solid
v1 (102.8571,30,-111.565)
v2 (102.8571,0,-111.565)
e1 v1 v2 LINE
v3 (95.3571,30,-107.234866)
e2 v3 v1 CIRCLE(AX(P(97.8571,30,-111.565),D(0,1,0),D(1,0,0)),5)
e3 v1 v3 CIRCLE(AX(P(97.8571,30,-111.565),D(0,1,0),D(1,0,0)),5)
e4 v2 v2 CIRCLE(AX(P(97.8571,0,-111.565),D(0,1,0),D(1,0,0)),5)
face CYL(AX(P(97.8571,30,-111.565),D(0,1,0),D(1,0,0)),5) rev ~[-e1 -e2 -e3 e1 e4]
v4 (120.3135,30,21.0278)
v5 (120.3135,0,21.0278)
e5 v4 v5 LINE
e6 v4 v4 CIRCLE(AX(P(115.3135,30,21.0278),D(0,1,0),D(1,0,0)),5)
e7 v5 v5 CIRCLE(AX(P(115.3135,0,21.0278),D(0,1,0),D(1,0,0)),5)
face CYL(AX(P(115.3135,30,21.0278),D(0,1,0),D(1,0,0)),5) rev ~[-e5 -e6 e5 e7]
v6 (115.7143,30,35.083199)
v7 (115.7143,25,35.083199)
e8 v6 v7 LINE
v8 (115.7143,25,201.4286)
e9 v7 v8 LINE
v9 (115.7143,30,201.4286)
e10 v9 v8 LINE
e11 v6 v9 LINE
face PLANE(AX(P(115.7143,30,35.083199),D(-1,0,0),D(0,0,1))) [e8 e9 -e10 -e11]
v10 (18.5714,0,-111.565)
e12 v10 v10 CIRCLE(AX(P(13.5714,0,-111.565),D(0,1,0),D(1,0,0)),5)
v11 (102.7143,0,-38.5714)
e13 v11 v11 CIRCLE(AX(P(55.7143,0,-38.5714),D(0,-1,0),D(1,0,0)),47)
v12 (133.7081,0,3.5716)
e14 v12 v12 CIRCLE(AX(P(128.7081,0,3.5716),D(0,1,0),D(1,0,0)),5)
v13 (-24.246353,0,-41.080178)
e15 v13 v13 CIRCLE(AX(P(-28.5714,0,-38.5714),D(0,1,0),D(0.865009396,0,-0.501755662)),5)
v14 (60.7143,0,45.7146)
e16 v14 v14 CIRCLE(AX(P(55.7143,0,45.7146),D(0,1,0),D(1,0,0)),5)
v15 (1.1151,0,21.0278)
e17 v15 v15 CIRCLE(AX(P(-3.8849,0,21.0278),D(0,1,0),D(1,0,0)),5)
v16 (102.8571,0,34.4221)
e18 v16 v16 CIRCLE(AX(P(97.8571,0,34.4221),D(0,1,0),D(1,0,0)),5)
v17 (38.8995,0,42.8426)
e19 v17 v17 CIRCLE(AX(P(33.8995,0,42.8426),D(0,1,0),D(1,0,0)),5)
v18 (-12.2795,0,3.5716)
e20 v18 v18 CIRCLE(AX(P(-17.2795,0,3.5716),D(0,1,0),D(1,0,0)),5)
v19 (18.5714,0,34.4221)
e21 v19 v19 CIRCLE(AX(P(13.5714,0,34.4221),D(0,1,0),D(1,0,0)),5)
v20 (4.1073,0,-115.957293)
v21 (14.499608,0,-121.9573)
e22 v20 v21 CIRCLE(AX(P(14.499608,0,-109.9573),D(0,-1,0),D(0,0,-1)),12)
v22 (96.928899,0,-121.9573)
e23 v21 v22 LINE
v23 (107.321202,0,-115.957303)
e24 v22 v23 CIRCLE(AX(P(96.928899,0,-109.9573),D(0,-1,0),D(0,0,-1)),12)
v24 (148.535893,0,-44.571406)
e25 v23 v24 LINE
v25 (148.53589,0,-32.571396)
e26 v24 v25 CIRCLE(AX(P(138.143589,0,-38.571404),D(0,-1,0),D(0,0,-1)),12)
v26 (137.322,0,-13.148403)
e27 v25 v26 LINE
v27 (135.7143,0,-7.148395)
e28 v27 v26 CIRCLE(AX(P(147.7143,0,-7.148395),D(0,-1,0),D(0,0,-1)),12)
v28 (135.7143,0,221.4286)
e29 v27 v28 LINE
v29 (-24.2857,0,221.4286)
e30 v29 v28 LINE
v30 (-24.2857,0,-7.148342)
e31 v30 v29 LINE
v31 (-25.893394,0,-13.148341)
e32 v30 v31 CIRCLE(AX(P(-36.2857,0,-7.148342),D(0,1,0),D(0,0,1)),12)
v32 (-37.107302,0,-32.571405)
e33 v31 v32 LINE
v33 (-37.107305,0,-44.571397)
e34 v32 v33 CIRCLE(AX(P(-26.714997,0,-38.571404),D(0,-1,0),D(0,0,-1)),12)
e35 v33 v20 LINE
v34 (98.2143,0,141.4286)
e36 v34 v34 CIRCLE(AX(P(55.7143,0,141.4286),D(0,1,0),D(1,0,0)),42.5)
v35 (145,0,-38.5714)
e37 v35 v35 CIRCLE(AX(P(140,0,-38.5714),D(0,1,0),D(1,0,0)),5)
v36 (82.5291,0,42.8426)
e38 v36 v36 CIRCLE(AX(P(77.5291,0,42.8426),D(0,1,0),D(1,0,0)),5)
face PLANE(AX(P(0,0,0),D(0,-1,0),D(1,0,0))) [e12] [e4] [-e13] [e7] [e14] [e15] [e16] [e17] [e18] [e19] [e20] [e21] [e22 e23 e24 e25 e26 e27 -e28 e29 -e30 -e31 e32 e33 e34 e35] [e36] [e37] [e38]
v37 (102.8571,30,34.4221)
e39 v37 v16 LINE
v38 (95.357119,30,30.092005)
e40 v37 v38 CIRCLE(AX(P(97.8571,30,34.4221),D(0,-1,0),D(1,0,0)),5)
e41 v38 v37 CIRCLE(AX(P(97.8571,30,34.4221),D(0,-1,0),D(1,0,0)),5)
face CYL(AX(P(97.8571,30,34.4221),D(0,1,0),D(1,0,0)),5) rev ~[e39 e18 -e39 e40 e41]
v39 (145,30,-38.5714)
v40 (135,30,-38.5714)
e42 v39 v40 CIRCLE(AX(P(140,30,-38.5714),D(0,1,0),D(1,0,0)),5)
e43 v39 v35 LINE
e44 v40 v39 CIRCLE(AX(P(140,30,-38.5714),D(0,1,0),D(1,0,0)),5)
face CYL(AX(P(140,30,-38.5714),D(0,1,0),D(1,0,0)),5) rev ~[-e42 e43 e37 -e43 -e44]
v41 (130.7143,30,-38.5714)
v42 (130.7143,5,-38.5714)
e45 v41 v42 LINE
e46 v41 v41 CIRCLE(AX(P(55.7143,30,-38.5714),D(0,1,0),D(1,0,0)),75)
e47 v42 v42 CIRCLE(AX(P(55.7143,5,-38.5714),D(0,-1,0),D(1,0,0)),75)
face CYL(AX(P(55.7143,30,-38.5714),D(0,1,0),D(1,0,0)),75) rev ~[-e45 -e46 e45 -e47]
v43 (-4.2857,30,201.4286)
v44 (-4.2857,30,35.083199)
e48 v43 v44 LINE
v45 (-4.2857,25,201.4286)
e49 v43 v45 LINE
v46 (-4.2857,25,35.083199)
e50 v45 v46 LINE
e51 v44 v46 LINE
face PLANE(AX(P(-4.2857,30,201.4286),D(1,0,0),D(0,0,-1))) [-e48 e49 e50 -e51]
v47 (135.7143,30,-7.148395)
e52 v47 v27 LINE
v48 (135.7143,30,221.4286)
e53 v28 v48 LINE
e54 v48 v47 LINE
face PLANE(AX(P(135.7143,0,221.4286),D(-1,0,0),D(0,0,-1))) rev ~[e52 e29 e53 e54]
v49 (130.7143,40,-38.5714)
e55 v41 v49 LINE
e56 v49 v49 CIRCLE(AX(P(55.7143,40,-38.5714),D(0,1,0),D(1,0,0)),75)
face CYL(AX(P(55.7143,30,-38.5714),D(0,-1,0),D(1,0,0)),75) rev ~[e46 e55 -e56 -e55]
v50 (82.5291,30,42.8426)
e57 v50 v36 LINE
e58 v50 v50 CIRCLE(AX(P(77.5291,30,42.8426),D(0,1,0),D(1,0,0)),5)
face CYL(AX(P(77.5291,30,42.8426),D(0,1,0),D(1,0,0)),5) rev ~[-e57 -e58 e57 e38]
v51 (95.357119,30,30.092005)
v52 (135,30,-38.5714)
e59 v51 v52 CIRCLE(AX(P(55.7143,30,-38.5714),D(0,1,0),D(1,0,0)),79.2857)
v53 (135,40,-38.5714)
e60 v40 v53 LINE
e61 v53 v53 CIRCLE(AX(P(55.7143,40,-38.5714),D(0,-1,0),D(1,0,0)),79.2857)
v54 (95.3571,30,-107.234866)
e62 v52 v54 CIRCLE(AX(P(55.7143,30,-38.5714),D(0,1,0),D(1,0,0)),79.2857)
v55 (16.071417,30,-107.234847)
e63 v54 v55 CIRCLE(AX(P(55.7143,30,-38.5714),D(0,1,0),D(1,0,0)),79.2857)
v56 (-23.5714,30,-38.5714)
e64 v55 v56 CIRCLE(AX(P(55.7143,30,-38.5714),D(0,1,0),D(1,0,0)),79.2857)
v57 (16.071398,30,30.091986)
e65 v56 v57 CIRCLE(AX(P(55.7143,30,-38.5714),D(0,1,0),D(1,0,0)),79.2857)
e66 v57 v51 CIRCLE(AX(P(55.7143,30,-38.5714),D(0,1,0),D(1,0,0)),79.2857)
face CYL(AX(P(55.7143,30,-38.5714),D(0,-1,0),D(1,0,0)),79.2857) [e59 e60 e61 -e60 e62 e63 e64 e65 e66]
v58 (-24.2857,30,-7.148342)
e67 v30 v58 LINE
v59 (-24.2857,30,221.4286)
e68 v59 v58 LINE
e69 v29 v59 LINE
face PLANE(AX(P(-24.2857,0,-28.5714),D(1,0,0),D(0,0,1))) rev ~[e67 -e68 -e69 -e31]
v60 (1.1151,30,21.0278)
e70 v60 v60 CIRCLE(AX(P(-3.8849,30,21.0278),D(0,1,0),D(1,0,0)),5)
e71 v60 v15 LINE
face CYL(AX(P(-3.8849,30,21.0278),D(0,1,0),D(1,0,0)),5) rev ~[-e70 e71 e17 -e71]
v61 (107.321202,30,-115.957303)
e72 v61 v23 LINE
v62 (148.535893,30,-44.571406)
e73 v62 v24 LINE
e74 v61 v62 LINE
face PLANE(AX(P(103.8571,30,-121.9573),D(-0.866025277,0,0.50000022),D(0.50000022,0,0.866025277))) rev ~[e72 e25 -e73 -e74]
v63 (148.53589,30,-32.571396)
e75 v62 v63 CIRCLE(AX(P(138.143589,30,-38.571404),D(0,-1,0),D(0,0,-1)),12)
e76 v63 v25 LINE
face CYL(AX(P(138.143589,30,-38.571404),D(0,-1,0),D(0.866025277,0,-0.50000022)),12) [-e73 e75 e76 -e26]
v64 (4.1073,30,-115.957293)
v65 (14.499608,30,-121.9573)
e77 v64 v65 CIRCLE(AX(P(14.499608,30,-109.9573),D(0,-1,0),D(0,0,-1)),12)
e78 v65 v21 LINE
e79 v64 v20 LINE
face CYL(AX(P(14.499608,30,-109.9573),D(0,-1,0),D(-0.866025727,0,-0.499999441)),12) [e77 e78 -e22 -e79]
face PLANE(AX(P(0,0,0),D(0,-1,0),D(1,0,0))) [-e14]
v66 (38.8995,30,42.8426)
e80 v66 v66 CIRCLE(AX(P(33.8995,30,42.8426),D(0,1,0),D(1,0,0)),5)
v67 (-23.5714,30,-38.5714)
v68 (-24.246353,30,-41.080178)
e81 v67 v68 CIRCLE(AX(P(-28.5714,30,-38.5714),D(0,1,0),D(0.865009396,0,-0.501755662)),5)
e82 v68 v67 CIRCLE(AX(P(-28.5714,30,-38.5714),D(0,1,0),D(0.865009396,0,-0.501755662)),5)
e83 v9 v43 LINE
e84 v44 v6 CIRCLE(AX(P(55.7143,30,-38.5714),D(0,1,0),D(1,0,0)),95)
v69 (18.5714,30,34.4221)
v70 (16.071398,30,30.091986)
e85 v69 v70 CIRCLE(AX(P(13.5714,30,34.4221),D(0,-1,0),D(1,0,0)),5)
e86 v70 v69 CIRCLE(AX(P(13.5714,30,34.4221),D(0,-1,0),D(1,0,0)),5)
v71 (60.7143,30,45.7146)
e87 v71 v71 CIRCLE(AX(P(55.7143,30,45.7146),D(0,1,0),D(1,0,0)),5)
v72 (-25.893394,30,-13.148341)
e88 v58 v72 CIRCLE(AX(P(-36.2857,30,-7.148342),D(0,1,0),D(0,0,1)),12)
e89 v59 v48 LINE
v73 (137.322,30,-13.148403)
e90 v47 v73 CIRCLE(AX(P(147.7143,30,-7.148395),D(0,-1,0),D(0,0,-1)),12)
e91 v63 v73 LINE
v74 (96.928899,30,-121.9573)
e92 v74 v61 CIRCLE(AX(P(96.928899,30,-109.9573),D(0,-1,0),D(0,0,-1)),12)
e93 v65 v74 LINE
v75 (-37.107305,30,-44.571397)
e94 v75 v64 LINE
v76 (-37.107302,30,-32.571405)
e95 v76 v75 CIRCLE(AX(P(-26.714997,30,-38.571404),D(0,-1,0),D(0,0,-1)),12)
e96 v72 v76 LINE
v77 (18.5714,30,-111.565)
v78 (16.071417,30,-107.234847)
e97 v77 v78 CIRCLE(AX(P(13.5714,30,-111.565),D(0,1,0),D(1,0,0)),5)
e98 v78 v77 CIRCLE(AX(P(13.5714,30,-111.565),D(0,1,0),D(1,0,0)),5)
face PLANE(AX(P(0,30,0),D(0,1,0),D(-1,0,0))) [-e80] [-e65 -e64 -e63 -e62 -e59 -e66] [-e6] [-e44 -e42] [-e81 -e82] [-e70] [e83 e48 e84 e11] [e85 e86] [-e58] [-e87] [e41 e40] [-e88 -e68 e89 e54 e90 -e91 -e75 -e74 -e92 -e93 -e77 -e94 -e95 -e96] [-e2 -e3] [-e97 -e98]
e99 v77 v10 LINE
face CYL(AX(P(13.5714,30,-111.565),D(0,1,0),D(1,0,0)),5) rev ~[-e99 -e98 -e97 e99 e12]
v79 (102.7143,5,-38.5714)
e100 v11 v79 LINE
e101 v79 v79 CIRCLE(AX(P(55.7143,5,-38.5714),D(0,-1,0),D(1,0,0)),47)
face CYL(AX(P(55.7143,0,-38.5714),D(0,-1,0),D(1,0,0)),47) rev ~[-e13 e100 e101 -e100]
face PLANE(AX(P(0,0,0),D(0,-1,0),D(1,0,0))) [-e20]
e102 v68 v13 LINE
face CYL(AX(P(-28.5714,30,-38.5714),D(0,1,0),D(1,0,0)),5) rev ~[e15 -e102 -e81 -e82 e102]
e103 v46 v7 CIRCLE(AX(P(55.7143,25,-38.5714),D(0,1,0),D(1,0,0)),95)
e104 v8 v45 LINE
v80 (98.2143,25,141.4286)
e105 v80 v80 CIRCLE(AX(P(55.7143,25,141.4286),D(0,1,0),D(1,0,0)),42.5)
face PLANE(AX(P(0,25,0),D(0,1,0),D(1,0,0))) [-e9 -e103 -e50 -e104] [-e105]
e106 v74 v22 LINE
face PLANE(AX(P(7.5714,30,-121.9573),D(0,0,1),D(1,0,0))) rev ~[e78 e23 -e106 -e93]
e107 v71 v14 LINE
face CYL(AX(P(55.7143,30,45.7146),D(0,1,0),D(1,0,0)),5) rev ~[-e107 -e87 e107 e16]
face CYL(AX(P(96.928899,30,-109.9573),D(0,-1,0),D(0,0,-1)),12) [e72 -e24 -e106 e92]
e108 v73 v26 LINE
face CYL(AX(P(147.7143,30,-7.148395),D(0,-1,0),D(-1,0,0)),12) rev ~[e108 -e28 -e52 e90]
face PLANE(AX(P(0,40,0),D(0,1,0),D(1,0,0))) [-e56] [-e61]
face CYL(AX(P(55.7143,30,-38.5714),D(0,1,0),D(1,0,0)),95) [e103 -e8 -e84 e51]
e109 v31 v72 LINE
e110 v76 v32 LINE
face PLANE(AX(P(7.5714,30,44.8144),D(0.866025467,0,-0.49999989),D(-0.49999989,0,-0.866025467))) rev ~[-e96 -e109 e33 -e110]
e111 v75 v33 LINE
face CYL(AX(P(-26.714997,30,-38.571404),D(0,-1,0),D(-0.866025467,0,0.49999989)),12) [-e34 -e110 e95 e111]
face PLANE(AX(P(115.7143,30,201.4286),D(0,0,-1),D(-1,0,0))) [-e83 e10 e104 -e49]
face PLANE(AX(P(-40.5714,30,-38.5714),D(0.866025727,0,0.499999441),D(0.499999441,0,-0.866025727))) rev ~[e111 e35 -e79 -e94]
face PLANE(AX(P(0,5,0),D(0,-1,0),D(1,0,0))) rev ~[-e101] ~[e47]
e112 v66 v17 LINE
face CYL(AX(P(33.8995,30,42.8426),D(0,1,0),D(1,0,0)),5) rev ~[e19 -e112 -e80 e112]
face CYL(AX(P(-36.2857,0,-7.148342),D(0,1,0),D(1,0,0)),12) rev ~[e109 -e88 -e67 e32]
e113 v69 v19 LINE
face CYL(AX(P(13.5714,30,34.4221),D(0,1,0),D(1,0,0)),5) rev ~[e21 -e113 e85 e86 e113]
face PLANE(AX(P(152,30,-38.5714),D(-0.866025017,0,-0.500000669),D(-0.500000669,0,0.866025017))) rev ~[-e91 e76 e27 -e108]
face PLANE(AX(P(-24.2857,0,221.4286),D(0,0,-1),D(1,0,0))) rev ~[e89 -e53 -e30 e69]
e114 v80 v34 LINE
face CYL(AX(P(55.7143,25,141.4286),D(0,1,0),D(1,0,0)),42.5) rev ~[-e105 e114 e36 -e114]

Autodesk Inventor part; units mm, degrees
ref_plane "YZ Plane" through (0, 0, 0) normal (1, 0, 0) x (0, 1, 0)
ref_plane "XZ Plane" through (0, 0, 0) normal (0, 1, 0) x (-1, 0, 0)
ref_plane "XY Plane" through (0, 0, 0) normal (0, 0, 1) x (1, 0, 0)
sketch "Sketch1" plane through (0, 0, 0) normal (0, 1, 0) x (-1, 0, 0)
  line L0 (24.2857, 221.4286) -> (-135.7143, 221.4286)
  line L1 (-135.7143, 221.4286) -> (-135.7143, -28.5714)
  line L2 (-135.7143, -28.5714) -> (24.2857, -28.5714)
  line L3 (24.2857, -28.5714) -> (24.2857, 221.4286)
  circle A0 centre (-55.7143, -38.5714) radius 80
  line L4 (24.2857, -28.5714) -> (24.2857, -38.5714)
  line L5 (-135.7143, -28.5714) -> (-135.7143, -38.5714)
  point P0 (0, 0)
  dimension "d0" = 250
  dimension "d1" = 160
  dimension "d2" = 160
  dimension "d8" = 10
extrude "Extrusion1" add sketch "Sketch1" along normal blind 30
sketch "Sketch2" plane through (0, 30, 0) normal (0, 1, 0) x (1, 0, 0)
  arc A0 (135.7143, 38.5714) -> (-24.2857, 38.5714) centre (55.7143, 38.5714) ccw projected
  circle A1 centre (55.7143, 38.5714) radius 75
  point P0 (0, 0)
  dimension "d5" = 150
extrude "Extrusion2" cut sketch "Sketch2" against normal blind 40
sketch "Sketch3" plane through (0, 30, 0) normal (0, 1, 0) x (1, 0, 0)
  circle A0 centre (55.7143, 38.5714) radius 75 projected
  circle A1 centre (55.7143, 38.5714) radius 75
  line L0 (152, 38.5714) -> (103.8571, -44.8144)
  line L1 (103.8571, -44.8144) -> (7.5714, -44.8144)
  line L2 (7.5714, -44.8144) -> (-40.5714, 38.5714)
  line L3 (-40.5714, 38.5714) -> (7.5714, 121.9573)
  line L4 (7.5714, 121.9573) -> (103.8571, 121.9573)
  line L5 (103.8571, 121.9573) -> (152, 38.5714)
  line L6 (140, 38.5714) -> (97.8571, -34.4221)
  line L7 (97.8571, -34.4221) -> (13.5714, -34.4221)
  line L8 (13.5714, -34.4221) -> (-28.5714, 38.5714)
  line L9 (-28.5714, 38.5714) -> (13.5714, 111.565)
  line L10 (13.5714, 111.565) -> (97.8571, 111.565)
  line L11 (97.8571, 111.565) -> (140, 38.5714)
  circle A2 centre (140, 38.5714) radius 5
  circle A3 centre (97.8571, 111.565) radius 5
  circle A4 centre (13.5714, 111.565) radius 5
  circle A5 centre (-28.5714, 38.5714) radius 5
  circle A6 centre (13.5714, -34.4221) radius 5
  circle A7 centre (97.8571, -34.4221) radius 5
  point P0 (0, 0)
  dimension "d15" = 360
sketch "Sketch4" plane through (0, 0, 0) normal (0, -1, 0) x (1, 0, 0)
  circle A0 centre (55.7143, -38.5714) radius 75 projected
  circle A1 centre (55.7143, -38.5714) radius 75
  circle A2 centre (55.7143, -38.5714) radius 47
  dimension "d9" = 94
  dimension "d10" = 150
extrude "Extrusion3" add sketch "Sketch4" against normal blind 5
sketch "Sketch5" plane through (0, 30, 0) normal (0, 1, 0) x (1, 0, 0)
  circle A0 centre (55.7143, 38.5714) radius 75
  circle A1 centre (55.7143, 38.5714) radius 75
  line L0 (152, 38.5714) -> (103.8571, -44.8144)
  line L1 (103.8571, -44.8144) -> (7.5714, -44.8144)
  line L2 (7.5714, -44.8144) -> (-40.5714, 38.5714)
  line L3 (-40.5714, 38.5714) -> (7.5714, 121.9573)
  line L4 (7.5714, 121.9573) -> (103.8571, 121.9573)
  line L5 (103.8571, 121.9573) -> (152, 38.5714)
  line L6 (140, 38.5714) -> (97.8571, -34.4221)
  line L7 (97.8571, -34.4221) -> (13.5714, -34.4221)
  line L8 (13.5714, -34.4221) -> (-28.5714, 38.5714)
  line L9 (-28.5714, 38.5714) -> (13.5714, 111.565)
  line L10 (13.5714, 111.565) -> (97.8571, 111.565)
  line L11 (97.8571, 111.565) -> (140, 38.5714)
  circle A2 centre (140, 38.5714) radius 5
  circle A3 centre (97.8571, 111.565) radius 5
  circle A4 centre (13.5714, 111.565) radius 5
  circle A5 centre (-28.5714, 38.5714) radius 5
  circle A6 centre (13.5714, -34.4221) radius 5
  circle A7 centre (97.8571, -34.4221) radius 5
  arc A8 (135.7143, 38.5714) -> (-24.2857, 38.5714) centre (55.7143, 38.5714) ccw projected
  circle A9 centre (55.7143, 38.5714) radius 2.2469
  point P0 (0, 0)
  point P1 (0, 0)
  dimension "d19" = 360
extrude "Extrusion4" cut sketch "Sketch5" against normal blind 30 contours A2 L11 L6 | L6 L11 A2 | A7 L7 L6 | L6 L7 A7 | A3 A8 L10 L11 | L11 L10 A3 | A3 A8 | A6 L8 L7 | L7 L8 A6 | A4 A8 L9 L10 | L10 L9 A4 | A4 A8 | A5 L9 L8 | L8 L9 A5
extrude "Extrusion5" add sketch "Sketch3" against normal blind 30 contours A0 L11 A2 L6 | A0 L10 A3 L11 | L6 A7 L7 A0 | A0 L9 A4 L10 | L7 A6 L8 A0 | A0 L8 A5 L9 | L0 L1 L2 L3 L4 L5
fillet "Fillet1" radius 12 6 edges at (103.8571, 15, -121.9573) (152, 15, -38.5714) (7.5714, 15, -121.9573) (-40.5714, 15, -38.5714) (-24.2857, 15, -10.3637) (135.7143, 15, -10.3637)
sketch "Sketch6" plane through (0, 30, 0) normal (0, 1, 0) x (1, 0, 0)
  circle A0 centre (13.5714, 111.565) radius 5 projected
  circle A1 centre (97.8571, 111.565) radius 5 projected
  circle A2 centre (-28.5714, 38.5714) radius 5 projected
  circle A3 centre (140, 38.5714) radius 5 projected
  circle A4 centre (55.7143, 38.5714) radius 75 projected
  circle A5 centre (97.8571, -34.4221) radius 5 projected
  circle A6 centre (13.5714, -34.4221) radius 5 projected
  arc A7 (-37.1073, 44.5714) -> (-37.1073, 32.5714) centre (-26.715, 38.5714) ccw projected
  line L0 (-37.1073, 32.5714) -> (-25.8934, 13.1484) projected
  arc A8 (-24.2857, 7.1484) -> (-25.8934, 13.1484) centre (-36.2857, 7.1484) ccw projected
  line L1 (-24.2857, 7.1484) -> (-24.2857, -221.4286) projected
  line L2 (-24.2857, -221.4286) -> (135.7143, -221.4286) projected
  line L3 (135.7143, -221.4286) -> (135.7143, 7.1484) projected
  arc A9 (137.322, 13.1484) -> (135.7143, 7.1484) centre (147.7143, 7.1484) ccw projected
  line L4 (137.322, 13.1484) -> (148.5359, 32.5714) projected
  arc A10 (148.5359, 32.5714) -> (148.5359, 44.5714) centre (138.1436, 38.5714) ccw projected
  line L5 (148.5359, 44.5714) -> (107.3212, 115.9573) projected
  arc A11 (107.3212, 115.9573) -> (96.9289, 121.9573) centre (96.9289, 109.9573) ccw projected
  line L6 (96.9289, 121.9573) -> (14.4996, 121.9573) projected
  arc A12 (14.4996, 121.9573) -> (4.1073, 115.9573) centre (14.4996, 109.9573) ccw projected
  line L7 (4.1073, 115.9573) -> (-37.1073, 44.5714) projected
  line L8 (-4.2857, -201.4286) -> (-4.2857, 7.1484)
  arc A13 (-4.2857, 7.1484) -> (-8.5729, 23.1484) centre (-36.2857, 7.1484) ccw
  line L9 (-8.5729, 23.1484) -> (-17.4774, 38.5714)
  line L10 (-17.4774, 38.5714) -> (19.1184, 101.9573)
  line L11 (19.1184, 101.9573) -> (92.3101, 101.9573)
  line L12 (92.3101, 101.9573) -> (128.906, 38.5714)
  line L13 (128.906, 38.5714) -> (120.0015, 23.1484)
  arc A14 (120.0015, 23.1484) -> (115.7143, 7.1484) centre (147.7143, 7.1484) ccw
  line L14 (115.7143, 7.1484) -> (115.7143, -201.4286)
  line L15 (115.7143, -201.4286) -> (-4.2857, -201.4286)
  circle A15 centre (55.7143, 38.5714) radius 95
  point P0 (0, 0)
  point P1 (115.7143, -35.0832)
  point P2 (-4.2857, -35.0832)
  dimension "d25" = 20
  dimension "d26" = 190
extrude "Extrusion6" cut sketch "Sketch6" against normal blind 5 contours A15 L14 L15 L8
sketch "Sketch7" plane through (0, 30, 0) normal (0, 1, 0) x (1, 0, 0)
  circle A0 centre (55.7143, 38.5714) radius 75 projected
  circle A1 centre (55.7143, 38.5714) radius 79.2857
  circle A2 centre (-28.5714, 38.5714) radius 5 projected
  circle A3 centre (55.7143, 38.5714) radius 75
  point P0 (0, 0)
  dimension "d29" = 150
extrude "Extrusion7" add sketch "Sketch7" along normal blind 10 contours A1
sketch "Sketch8" plane through (0, 30, 0) normal (0, 1, 0) x (1, 0, 0)
  circle A0 centre (55.7143, -45.7146) radius 5
  circle A1 centre (55.7143, 38.5714) radius 47 projected
  circle A2 centre (77.5291, -42.8426) radius 5
  circle A3 centre (97.8573, -34.4224) radius 5
  circle A4 centre (115.3135, -21.0278) radius 5
  circle A5 centre (128.7081, -3.5716) radius 5
  circle A6 centre (137.1283, 16.7566) radius 5
  circle A7 centre (140.0003, 38.5714) radius 5
  circle A8 centre (137.1283, 60.3863) radius 5
  circle A9 centre (128.7081, 80.7144) radius 5
  circle A10 centre (115.3135, 98.1706) radius 5
  circle A11 centre (97.8573, 111.5652) radius 5
  circle A12 centre (77.5291, 119.9855) radius 5
  circle A13 centre (55.7143, 122.8574) radius 5
  circle A14 centre (33.8995, 119.9855) radius 5
  circle A15 centre (13.5713, 111.5652) radius 5
  circle A16 centre (-3.8849, 98.1706) radius 5
  circle A17 centre (-17.2795, 80.7144) radius 5
  circle A18 centre (-25.6997, 60.3863) radius 5
  circle A19 centre (-28.5717, 38.5714) radius 5
  circle A20 centre (-25.6997, 16.7566) radius 5
  circle A21 centre (-17.2795, -3.5716) radius 5
  circle A22 centre (-3.8849, -21.0278) radius 5
  circle A23 centre (13.5713, -34.4224) radius 5
  circle A24 centre (33.8995, -42.8426) radius 5
  point P0 (0, 0)
  dimension "d32" = 84.286
  dimension "d35" = 360
  dimension "d39" = 10
extrude "Extrusion8" cut sketch "Sketch8" against normal blind 35 contours A0 | A2 | A4 | A5 | A21 | A22 | A24
sketch "Sketch9" plane through (0, 25, 0) normal (0, 1, 0) x (1, 0, 0)
  line L0 (135.7143, -221.4286) -> (135.7143, 7.1484) projected
  line L1 (-24.2857, -221.4286) -> (135.7143, -221.4286) projected
  line L2 (-24.2857, 7.1484) -> (-24.2857, -221.4286) projected
  circle A0 centre (55.7143, -141.4286) radius 80
  circle A1 centre (55.7143, -141.4286) radius 42.5
  point P0 (0, 0)
  dimension "d40" = 85
extrude "Extrusion9" cut sketch "Sketch9" against normal blind 40 contours A1
sketch "Sketch10" plane through (0, 0, 0) normal (0, -1, 0) x (1, 0, 0)
  circle A0 centre (-17.2795, 3.5716) radius 5 projected
  circle A1 centre (128.7081, 3.5716) radius 5 projected
  point P0 (0, 0)
extrude "Extrusion10" add sketch "Sketch10" against normal blind 30
properties part number "PatronDerzavka" material "Aluminum 6061"
